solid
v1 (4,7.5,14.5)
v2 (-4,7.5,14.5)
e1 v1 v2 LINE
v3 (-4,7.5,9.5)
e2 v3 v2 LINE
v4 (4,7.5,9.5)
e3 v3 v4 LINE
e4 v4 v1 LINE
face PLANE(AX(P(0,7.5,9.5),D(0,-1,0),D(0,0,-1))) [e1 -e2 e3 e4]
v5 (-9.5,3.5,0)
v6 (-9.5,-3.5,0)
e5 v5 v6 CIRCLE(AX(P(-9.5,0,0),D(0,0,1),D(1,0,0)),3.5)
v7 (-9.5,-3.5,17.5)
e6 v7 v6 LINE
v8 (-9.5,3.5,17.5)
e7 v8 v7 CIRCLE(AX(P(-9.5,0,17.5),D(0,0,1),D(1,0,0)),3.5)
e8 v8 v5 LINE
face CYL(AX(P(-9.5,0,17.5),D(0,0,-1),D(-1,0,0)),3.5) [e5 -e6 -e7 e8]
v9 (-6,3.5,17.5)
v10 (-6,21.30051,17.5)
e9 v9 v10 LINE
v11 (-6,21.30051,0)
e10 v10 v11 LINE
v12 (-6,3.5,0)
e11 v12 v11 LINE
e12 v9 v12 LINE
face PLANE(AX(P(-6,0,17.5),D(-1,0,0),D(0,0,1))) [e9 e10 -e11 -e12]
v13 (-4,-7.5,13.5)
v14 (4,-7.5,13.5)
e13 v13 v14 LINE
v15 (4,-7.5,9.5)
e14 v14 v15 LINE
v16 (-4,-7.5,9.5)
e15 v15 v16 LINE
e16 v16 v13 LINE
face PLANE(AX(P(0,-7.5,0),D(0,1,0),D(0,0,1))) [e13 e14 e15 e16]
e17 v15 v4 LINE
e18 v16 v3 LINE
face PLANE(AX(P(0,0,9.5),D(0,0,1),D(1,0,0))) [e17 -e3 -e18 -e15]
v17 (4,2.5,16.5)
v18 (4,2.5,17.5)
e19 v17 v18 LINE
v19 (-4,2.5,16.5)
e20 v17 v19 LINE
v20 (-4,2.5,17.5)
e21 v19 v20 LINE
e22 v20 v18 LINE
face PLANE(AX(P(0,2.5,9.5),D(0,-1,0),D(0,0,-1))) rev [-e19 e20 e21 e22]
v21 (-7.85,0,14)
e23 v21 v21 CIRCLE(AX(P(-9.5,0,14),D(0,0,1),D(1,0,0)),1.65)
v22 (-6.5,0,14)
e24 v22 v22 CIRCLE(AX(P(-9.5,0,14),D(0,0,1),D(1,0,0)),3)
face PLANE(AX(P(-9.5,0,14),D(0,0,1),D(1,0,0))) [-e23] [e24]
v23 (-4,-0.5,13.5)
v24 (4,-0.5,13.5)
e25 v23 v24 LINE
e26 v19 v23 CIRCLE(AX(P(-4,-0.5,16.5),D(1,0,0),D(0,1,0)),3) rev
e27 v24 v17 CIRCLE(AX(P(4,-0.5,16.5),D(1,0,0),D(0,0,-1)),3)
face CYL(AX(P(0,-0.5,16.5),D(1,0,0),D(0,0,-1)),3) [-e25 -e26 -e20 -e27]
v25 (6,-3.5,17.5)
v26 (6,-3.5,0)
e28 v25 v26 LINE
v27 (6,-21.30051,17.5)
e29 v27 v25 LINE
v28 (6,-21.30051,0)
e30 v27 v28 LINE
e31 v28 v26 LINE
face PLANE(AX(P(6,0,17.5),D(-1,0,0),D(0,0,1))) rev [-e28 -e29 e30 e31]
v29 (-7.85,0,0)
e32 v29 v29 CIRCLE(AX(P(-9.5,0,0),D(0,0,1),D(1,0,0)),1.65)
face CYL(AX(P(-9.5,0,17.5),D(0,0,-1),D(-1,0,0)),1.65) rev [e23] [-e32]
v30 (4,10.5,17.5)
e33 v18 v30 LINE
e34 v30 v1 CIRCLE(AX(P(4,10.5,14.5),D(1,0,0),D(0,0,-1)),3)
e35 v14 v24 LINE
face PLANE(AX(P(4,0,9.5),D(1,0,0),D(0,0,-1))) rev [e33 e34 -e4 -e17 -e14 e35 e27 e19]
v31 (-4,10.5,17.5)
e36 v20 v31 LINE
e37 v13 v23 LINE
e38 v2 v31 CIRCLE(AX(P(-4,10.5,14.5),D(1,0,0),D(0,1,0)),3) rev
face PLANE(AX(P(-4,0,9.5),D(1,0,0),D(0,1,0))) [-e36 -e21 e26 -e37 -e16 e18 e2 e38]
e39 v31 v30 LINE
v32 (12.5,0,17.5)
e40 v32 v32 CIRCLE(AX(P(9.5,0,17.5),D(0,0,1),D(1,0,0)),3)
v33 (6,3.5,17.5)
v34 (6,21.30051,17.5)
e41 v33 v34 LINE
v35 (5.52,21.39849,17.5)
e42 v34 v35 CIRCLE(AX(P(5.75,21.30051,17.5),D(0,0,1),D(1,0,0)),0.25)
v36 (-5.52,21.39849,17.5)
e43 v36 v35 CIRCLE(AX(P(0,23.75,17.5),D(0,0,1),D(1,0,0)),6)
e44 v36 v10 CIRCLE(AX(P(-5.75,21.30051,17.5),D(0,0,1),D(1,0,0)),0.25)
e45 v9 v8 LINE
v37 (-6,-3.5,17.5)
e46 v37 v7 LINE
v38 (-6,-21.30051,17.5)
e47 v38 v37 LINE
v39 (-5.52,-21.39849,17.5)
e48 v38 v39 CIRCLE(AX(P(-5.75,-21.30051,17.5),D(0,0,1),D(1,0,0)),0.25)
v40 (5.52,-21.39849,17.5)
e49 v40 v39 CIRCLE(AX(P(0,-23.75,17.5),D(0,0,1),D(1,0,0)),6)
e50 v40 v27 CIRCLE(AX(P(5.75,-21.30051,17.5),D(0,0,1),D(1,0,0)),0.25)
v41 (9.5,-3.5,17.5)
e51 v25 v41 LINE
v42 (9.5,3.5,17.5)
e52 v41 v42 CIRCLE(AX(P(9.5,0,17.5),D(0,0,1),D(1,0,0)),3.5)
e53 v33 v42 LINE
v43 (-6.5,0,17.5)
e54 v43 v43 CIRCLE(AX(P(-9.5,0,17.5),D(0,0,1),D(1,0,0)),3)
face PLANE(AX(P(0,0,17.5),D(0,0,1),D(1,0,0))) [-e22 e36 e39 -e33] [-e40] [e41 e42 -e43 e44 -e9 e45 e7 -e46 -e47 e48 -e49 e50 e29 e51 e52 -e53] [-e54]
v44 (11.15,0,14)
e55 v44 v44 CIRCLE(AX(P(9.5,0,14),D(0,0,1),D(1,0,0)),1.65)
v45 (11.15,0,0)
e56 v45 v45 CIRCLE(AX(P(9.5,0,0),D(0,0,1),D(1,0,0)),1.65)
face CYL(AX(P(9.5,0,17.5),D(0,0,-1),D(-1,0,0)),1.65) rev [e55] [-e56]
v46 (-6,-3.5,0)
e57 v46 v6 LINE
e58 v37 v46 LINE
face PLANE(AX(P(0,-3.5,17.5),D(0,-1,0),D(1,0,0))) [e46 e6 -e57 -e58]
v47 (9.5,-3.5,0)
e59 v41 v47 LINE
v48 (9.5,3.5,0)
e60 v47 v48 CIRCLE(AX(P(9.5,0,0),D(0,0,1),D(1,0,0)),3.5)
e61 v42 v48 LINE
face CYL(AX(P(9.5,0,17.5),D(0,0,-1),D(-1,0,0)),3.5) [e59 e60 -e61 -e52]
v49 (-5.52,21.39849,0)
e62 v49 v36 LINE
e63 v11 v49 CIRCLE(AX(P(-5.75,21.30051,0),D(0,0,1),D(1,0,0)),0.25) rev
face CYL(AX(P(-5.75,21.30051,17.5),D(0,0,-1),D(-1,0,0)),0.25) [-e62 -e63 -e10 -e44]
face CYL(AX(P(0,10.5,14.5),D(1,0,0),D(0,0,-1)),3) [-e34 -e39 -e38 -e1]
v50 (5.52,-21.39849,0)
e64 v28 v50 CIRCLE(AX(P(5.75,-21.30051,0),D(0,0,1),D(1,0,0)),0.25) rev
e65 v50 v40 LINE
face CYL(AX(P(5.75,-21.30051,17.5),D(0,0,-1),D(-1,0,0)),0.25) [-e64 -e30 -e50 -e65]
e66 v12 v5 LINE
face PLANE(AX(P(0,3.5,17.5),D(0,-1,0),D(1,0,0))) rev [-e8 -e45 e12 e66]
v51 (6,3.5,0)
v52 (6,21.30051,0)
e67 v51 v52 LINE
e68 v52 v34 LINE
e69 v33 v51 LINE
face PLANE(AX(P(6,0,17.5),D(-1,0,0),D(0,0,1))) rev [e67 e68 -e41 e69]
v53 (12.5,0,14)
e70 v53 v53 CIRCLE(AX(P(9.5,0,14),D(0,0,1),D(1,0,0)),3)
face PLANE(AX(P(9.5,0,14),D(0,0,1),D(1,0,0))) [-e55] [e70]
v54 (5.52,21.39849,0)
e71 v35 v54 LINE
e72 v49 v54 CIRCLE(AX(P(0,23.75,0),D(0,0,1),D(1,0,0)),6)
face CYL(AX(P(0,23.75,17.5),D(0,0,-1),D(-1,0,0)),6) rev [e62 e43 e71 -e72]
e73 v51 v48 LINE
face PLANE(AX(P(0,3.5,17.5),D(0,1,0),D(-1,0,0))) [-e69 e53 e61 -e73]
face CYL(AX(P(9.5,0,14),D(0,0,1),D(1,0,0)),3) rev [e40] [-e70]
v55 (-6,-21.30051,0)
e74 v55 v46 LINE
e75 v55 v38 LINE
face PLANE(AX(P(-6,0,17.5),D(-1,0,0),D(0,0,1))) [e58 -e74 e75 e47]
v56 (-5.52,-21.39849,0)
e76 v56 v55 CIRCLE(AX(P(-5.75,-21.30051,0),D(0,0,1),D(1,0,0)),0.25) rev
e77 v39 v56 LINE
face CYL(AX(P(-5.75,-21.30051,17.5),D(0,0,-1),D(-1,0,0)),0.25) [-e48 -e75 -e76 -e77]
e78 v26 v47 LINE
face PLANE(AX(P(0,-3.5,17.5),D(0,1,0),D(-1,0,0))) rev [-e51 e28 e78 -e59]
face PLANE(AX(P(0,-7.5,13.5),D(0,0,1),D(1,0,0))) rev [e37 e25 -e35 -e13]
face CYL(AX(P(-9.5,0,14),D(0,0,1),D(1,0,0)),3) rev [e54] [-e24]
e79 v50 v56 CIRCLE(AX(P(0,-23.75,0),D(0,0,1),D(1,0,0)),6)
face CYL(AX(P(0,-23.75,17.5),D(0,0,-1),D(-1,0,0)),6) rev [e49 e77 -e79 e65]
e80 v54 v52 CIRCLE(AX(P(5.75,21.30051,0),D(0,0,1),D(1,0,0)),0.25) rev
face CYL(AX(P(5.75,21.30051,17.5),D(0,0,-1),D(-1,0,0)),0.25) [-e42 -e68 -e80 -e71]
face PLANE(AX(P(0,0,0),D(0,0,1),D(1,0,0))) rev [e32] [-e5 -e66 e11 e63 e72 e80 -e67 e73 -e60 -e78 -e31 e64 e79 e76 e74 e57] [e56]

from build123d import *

# Parameters (mm, degrees)
SKETCH1_R                       = 1.65
BOSS_EXTRUDE1_DEPTH             = 17.5
FILLET1_R                       = 0.25
SKIZZE1_W                       = 8
SKIZZE1_H                       = 5
SCHNITT_LINEAR_AUSTRAGEN1_DEPTH = 8
SKIZZE2_W                       = 8
SKIZZE2_H                       = 4
SCHNITT_LINEAR_AUSTRAGEN2_DEPTH = 10
VERRUNDUNG1_R                   = 3
SKIZZE3_R                       = 3
SCHNITT_LINEAR_AUSTRAGEN3_DEPTH = 3.5


with BuildPart() as part:
    # Sketch1 → Boss-Extrude1 (new body)
    with BuildSketch(Plane.XY):
        with BuildLine():
            Line((-6, -3.5), (-6, -23.75))
            ThreePointArc((-6, -23.75), (0, -17.75), (6, -23.75))
            Line((6, -23.75), (6, -3.5))
            Line((6, -3.5), (9.5, -3.5))
            ThreePointArc((9.5, -3.5), (13, 0), (9.5, 3.5))
            Line((9.5, 3.5), (6, 3.5))
            Line((6, 3.5), (6, 23.75))
            ThreePointArc((6, 23.75), (0, 17.75), (-6, 23.75))
            Line((-6, 23.75), (-6, 3.5))
            Line((-6, 3.5), (-9.5, 3.5))
            ThreePointArc((-9.5, 3.5), (-13, 0), (-9.5, -3.5))
            Line((-9.5, -3.5), (-6, -3.5))
        make_face()
        with Locations((-9.5, 0)):
            Circle(SKETCH1_R, mode=Mode.SUBTRACT)
        with Locations((9.5, 0)):
            Circle(SKETCH1_R, mode=Mode.SUBTRACT)
    extrude(amount=BOSS_EXTRUDE1_DEPTH)

    # Fillet1
    fillet1_edges = [part.edges().sort_by_distance(p)[0] for p in [
        (6, -23.75, 8.75),
        (6, 23.75, 8.75),
        (-6, 23.75, 8.75),
    ]]
    fillet(fillet1_edges, radius=FILLET1_R)
    fillet1_2_edges = [part.edges().sort_by_distance(p)[0] for p in [
        (-6, -23.75, 8.75),
    ]]
    fillet(fillet1_2_edges, radius=FILLET1_R)

    # Skizze1 → Schnitt-Linear austragen1 (cut)
    with BuildSketch(Plane.XY.offset(17.5)):
        with Locations((0, 5)):
            Rectangle(SKIZZE1_W, SKIZZE1_H)
    extrude(amount=-SCHNITT_LINEAR_AUSTRAGEN1_DEPTH, mode=Mode.SUBTRACT)

    # Skizze2 → Schnitt-Linear austragen2 (cut)
    with BuildSketch(Plane(origin=(0, 2.5, 0), x_dir=(1, 0, 0), z_dir=(0, 1, 0))):
        with Locations((0, -11.5)):
            Rectangle(SKIZZE2_W, SKIZZE2_H)
    extrude(amount=-SCHNITT_LINEAR_AUSTRAGEN2_DEPTH, mode=Mode.SUBTRACT)

    # Verrundung1
    verrundung1_edges = [part.edges().sort_by_distance(p)[0] for p in [
        (0, 7.5, 17.5),
        (0, 2.5, 13.5),
    ]]
    fillet(verrundung1_edges, radius=VERRUNDUNG1_R)

    # Skizze3 → Schnitt-Linear austragen3 (cut)
    with BuildSketch(Plane.XY.offset(17.5)):
        with Locations((-9.5, 0)):
            Circle(SKIZZE3_R)
        with Locations((9.5, 0)):
            Circle(SKIZZE3_R)
    extrude(amount=-SCHNITT_LINEAR_AUSTRAGEN3_DEPTH, mode=Mode.SUBTRACT)


solid = part.part
